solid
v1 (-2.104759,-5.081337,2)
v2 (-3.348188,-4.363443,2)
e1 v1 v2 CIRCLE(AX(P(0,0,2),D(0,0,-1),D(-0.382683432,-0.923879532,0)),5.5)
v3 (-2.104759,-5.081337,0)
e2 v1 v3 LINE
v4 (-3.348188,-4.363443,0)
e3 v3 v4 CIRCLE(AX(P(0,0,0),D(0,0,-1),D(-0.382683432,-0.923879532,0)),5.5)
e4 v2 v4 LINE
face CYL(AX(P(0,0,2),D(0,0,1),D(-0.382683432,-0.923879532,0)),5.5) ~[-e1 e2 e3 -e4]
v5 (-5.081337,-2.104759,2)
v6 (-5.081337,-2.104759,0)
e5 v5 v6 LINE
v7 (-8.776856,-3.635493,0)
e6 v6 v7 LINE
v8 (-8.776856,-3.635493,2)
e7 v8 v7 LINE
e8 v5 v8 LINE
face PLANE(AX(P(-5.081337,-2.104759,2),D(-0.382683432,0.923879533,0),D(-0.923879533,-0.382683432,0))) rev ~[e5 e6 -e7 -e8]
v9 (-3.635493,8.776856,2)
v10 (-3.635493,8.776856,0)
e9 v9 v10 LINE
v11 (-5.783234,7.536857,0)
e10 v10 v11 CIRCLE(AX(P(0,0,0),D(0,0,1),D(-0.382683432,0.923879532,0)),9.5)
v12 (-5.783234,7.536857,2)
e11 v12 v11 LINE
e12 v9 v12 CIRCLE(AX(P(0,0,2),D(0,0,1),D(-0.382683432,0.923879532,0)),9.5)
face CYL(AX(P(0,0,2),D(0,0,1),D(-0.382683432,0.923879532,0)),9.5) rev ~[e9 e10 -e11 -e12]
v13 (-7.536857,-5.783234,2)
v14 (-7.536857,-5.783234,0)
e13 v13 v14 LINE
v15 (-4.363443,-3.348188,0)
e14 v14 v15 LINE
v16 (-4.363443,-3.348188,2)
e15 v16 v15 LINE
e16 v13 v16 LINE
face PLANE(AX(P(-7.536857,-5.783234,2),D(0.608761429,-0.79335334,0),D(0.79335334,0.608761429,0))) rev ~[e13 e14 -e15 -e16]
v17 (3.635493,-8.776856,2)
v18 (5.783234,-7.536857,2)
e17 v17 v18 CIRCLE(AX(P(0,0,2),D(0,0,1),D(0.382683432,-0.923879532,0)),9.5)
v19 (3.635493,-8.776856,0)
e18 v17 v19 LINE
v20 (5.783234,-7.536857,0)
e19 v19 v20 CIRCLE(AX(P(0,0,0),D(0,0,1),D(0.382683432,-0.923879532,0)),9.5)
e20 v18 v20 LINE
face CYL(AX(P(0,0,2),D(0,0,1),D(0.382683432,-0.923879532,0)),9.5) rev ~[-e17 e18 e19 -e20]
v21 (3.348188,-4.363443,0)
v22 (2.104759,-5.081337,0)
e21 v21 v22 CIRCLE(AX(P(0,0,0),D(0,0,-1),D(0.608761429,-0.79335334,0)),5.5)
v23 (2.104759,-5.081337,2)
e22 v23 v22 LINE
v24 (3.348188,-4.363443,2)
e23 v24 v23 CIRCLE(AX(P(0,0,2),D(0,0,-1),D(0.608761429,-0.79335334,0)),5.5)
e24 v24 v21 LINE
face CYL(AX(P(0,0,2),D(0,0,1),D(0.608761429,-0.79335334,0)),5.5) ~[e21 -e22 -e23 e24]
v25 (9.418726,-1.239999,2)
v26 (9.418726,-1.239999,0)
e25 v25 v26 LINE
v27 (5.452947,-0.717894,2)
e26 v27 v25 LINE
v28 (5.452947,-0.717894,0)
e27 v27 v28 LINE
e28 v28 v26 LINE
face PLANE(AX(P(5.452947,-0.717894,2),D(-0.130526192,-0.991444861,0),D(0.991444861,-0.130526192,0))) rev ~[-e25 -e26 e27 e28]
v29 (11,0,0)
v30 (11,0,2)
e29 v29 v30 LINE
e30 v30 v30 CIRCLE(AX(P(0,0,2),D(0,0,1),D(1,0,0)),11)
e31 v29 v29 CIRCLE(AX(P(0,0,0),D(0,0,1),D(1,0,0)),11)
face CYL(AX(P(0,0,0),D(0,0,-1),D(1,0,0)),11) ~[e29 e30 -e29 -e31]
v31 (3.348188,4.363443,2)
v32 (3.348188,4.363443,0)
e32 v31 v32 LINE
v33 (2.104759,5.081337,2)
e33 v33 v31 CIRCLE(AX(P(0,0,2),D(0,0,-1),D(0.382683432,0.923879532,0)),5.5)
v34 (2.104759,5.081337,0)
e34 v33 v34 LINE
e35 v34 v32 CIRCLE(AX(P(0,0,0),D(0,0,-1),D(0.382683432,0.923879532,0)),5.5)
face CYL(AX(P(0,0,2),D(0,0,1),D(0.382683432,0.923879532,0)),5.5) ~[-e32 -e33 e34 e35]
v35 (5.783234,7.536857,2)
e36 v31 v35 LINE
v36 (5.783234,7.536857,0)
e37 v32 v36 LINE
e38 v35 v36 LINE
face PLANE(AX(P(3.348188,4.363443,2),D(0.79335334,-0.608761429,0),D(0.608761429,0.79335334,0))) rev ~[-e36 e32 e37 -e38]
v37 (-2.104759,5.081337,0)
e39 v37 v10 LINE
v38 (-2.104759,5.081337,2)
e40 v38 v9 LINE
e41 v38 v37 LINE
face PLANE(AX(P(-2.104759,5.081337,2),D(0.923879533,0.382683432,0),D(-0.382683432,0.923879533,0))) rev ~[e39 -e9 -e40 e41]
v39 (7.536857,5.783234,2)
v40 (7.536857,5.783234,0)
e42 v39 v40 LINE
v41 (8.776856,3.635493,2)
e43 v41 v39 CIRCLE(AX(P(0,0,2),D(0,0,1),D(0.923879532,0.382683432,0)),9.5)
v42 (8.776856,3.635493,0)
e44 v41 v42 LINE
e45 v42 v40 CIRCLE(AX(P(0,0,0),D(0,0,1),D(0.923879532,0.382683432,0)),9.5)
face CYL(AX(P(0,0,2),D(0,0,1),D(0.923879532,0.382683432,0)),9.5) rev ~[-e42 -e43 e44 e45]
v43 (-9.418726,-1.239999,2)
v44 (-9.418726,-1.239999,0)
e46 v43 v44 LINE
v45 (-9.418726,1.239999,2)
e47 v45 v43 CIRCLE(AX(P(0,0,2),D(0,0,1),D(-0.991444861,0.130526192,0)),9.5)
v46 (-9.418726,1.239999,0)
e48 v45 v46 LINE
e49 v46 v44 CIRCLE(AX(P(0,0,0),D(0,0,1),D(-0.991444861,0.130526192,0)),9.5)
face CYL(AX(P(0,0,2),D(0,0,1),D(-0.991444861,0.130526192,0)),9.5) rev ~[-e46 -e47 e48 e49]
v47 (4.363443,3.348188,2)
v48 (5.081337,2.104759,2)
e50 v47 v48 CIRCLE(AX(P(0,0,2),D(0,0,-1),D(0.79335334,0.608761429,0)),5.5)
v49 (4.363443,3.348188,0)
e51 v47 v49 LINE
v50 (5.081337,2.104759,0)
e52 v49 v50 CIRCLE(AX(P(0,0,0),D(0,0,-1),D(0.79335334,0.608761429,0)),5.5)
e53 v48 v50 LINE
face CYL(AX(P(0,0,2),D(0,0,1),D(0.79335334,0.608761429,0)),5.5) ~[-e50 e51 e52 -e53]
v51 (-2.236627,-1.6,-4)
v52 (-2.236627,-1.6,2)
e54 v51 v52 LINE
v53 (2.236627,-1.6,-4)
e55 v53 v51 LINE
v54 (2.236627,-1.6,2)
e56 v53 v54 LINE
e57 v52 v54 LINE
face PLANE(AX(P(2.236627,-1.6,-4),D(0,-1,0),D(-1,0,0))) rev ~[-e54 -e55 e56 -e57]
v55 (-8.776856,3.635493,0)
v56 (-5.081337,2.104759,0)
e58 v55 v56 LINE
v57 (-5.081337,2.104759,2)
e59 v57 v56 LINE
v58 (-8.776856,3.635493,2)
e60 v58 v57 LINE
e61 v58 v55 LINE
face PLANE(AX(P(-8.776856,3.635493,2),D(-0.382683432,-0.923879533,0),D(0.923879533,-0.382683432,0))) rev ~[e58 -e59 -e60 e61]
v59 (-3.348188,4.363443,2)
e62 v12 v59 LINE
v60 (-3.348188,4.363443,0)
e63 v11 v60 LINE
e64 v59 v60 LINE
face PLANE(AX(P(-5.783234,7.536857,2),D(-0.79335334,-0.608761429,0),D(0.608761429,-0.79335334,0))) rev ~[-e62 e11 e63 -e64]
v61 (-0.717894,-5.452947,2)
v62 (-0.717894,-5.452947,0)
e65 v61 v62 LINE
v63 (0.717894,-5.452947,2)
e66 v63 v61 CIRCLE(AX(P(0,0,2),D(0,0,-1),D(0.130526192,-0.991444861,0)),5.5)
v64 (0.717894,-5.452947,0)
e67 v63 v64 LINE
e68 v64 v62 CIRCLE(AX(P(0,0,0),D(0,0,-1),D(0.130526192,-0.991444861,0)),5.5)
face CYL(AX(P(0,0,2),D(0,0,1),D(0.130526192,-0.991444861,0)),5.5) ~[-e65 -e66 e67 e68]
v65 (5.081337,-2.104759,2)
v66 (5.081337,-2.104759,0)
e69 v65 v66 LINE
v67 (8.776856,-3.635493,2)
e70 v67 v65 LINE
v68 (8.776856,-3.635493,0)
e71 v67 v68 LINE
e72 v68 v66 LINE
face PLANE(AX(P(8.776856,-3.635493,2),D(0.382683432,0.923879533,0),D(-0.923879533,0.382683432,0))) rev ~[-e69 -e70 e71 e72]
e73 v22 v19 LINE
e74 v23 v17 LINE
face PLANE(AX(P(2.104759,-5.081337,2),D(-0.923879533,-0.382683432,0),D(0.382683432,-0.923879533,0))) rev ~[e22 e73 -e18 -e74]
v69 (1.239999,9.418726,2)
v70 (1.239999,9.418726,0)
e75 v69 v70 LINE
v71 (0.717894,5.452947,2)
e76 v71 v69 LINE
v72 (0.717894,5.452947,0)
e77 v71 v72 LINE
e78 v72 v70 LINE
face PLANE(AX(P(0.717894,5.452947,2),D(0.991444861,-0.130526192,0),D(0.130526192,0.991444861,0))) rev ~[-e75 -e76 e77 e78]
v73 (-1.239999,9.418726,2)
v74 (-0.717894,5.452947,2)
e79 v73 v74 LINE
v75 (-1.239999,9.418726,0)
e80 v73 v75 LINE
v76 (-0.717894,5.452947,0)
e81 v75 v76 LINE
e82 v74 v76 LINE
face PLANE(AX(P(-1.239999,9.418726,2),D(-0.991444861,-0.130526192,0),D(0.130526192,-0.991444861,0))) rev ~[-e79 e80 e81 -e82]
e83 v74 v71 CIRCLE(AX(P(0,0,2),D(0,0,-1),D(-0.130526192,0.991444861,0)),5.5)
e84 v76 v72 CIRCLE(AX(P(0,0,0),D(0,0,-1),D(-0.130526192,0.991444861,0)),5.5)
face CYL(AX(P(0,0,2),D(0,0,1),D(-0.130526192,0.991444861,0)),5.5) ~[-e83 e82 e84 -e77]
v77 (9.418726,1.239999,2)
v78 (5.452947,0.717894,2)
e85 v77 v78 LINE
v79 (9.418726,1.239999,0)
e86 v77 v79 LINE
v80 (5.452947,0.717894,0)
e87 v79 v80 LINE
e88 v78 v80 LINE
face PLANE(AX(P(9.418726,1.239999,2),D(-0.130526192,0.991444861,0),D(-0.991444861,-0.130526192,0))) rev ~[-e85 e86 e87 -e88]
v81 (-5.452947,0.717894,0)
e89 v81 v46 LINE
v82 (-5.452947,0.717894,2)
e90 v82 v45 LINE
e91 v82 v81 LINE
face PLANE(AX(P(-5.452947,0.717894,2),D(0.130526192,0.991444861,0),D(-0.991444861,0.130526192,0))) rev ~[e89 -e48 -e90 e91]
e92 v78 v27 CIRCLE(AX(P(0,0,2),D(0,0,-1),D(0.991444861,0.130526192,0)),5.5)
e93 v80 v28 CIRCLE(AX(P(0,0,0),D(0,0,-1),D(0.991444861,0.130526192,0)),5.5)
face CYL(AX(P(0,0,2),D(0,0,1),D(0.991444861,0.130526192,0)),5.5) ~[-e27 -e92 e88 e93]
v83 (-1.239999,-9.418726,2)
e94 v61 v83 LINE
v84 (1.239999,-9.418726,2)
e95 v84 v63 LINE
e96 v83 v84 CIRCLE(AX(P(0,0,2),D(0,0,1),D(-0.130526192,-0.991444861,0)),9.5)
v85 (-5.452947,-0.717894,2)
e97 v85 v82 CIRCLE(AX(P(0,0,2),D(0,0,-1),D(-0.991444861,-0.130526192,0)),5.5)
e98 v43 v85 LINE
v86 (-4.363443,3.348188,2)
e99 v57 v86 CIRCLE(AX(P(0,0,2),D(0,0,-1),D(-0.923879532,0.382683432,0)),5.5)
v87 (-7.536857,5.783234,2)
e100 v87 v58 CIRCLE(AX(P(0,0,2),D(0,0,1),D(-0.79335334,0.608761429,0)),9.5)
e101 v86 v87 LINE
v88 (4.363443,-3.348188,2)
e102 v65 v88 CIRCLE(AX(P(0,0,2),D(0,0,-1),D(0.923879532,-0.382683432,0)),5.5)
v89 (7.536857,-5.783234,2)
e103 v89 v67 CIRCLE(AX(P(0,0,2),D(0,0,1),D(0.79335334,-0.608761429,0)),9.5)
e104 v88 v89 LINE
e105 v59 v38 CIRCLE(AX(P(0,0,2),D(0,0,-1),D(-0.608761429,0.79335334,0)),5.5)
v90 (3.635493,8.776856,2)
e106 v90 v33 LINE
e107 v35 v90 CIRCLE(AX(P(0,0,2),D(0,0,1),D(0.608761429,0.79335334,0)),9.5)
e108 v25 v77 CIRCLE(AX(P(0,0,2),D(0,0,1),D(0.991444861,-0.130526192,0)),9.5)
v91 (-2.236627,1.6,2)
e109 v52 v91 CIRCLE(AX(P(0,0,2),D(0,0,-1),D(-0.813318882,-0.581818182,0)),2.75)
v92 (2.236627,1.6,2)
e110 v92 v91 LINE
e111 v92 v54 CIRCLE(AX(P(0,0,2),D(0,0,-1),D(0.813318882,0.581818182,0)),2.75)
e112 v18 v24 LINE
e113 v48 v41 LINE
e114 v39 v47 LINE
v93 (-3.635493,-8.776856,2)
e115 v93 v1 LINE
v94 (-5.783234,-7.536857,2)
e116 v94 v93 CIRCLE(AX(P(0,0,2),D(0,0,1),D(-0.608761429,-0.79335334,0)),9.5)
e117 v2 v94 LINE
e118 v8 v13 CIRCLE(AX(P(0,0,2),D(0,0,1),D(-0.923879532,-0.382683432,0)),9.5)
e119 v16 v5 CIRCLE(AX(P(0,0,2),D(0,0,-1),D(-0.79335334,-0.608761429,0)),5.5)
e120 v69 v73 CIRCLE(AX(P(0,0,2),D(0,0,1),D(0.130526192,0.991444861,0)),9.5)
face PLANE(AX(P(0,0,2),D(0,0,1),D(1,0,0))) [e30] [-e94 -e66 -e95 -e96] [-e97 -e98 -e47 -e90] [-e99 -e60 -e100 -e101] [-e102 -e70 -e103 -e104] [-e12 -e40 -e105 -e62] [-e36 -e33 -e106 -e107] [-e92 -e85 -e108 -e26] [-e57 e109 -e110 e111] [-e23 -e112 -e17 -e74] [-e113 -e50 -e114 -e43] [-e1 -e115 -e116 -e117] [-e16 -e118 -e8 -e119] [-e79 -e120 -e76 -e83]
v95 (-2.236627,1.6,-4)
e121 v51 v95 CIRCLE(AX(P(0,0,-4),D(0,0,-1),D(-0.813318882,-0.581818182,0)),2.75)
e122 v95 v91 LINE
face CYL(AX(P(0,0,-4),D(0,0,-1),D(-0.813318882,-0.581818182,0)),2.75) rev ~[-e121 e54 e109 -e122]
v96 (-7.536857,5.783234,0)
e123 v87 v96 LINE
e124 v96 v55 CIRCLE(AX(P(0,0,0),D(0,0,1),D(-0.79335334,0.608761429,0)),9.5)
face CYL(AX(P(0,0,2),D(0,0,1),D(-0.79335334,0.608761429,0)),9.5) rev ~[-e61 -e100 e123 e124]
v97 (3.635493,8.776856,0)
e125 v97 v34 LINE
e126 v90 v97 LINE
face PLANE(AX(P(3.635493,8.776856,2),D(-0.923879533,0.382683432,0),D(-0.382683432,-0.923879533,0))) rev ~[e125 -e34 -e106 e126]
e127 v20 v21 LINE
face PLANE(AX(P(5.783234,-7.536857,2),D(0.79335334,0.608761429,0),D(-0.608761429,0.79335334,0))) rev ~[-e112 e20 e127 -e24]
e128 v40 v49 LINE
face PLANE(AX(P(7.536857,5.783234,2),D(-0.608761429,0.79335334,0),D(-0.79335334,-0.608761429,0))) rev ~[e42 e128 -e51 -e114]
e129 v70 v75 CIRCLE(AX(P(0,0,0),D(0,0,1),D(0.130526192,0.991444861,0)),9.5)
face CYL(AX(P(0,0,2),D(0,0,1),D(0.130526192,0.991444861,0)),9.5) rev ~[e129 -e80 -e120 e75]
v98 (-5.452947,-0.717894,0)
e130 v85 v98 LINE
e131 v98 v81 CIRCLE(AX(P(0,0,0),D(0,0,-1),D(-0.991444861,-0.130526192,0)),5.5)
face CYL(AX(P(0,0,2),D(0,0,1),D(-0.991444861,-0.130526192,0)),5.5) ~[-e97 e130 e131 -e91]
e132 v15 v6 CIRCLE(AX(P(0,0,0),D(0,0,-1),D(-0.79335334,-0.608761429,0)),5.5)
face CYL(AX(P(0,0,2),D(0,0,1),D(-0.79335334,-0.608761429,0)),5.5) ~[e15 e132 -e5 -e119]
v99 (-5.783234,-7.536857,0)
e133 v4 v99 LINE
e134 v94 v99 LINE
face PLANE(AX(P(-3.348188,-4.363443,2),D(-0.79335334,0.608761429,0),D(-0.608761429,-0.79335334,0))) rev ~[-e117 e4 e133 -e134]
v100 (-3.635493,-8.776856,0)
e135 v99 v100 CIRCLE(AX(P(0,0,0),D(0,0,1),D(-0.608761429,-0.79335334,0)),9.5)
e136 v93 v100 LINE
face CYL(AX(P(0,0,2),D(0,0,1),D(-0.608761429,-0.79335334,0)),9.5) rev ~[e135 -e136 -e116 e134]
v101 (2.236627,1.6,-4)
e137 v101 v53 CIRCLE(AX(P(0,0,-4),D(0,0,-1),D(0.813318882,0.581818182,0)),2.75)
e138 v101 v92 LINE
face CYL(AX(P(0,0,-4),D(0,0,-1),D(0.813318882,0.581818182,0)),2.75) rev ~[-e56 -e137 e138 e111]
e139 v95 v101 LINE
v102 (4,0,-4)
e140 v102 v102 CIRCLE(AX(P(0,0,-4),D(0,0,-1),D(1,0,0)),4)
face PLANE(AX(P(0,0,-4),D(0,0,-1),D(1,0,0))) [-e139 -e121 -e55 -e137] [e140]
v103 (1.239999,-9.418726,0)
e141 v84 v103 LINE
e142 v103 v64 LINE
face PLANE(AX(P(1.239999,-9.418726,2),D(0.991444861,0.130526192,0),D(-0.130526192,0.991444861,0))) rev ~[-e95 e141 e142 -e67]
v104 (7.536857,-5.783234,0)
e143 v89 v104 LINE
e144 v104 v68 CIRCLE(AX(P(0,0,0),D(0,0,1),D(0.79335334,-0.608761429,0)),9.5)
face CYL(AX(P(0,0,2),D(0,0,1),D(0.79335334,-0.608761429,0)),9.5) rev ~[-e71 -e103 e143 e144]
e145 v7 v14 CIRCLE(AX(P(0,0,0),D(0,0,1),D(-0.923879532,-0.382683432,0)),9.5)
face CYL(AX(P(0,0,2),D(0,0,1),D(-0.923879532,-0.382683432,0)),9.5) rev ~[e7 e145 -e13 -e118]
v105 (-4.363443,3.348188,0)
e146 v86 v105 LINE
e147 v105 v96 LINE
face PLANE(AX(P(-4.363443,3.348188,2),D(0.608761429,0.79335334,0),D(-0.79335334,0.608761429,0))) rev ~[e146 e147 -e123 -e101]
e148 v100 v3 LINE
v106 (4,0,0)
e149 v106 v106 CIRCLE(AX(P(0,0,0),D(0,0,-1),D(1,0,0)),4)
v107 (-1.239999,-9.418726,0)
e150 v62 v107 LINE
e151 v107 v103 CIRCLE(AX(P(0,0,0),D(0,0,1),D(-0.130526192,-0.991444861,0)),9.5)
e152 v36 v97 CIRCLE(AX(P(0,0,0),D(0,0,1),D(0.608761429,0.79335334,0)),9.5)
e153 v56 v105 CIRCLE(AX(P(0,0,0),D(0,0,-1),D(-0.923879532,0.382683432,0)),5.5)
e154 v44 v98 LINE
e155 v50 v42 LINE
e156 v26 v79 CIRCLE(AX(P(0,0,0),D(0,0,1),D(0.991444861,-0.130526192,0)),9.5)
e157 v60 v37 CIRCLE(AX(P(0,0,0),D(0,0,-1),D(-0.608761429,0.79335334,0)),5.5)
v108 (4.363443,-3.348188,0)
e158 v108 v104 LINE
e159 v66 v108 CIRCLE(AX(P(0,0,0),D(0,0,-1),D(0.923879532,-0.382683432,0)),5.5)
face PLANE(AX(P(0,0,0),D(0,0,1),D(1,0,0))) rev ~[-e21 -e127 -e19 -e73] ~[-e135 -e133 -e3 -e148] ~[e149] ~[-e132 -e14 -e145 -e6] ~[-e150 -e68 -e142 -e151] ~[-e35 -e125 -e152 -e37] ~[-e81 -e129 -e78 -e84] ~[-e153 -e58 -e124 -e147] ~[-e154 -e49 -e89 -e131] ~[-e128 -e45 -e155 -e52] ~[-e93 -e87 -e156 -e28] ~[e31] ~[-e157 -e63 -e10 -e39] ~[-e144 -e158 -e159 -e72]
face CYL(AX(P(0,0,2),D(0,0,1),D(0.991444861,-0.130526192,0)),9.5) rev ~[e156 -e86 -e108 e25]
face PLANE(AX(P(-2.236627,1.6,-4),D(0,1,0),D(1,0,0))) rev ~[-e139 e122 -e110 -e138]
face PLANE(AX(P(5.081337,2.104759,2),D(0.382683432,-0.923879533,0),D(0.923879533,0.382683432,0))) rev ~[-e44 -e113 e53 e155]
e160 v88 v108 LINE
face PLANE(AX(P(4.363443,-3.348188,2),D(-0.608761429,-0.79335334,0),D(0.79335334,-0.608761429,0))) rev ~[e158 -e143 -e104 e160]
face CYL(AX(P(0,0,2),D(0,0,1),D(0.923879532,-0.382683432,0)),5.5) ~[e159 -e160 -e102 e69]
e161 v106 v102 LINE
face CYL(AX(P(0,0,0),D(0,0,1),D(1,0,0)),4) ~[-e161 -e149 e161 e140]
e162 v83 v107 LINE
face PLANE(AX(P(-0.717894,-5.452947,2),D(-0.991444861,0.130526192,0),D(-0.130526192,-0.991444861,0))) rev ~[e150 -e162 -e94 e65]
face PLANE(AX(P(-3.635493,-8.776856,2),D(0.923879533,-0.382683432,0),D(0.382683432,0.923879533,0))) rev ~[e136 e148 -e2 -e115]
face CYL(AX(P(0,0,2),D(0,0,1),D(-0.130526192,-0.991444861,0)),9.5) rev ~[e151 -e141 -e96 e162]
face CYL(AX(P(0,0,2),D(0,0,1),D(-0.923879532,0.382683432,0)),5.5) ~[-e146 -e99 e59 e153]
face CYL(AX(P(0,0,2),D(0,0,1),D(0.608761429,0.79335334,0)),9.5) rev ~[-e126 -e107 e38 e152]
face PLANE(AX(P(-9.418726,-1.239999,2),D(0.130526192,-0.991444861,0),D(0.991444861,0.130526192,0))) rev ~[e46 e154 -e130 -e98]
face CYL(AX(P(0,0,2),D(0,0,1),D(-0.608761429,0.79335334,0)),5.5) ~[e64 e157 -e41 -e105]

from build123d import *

# Parameters (mm, degrees)
F0_R            = 11
F1_DEPTH        = 2
F3_DEPTH        = 2
F3_COPIES_COUNT = 12
F4_R            = 4
F5_DEPTH        = 4
F7_DEPTH        = 9


# Not quite as in the source:
# - a pattern or mirror of a feature is missing from the dataset's text; its kind, count and spacing are read off the source's solid


with BuildPart() as f1:
    # F0 (on Top) → F1 (new body)
    with BuildSketch(Plane.XY):
        Circle(F0_R)
    extrude(amount=F1_DEPTH)

    # F2 (on face) → F3 (cut)
    with BuildSketch(Plane.XY.offset(2)):
        with BuildLine():
            Line((9.4187261831, 1.2399988261), (5.4529467376, 0.7178940572))
            ThreePointArc((5.4529467376, 0.7178940572), (5.5, 0), (5.4529467376, -0.7178940572))
            Line((5.4529467376, -0.7178940572), (9.4187261831, -1.2399988261))
            ThreePointArc((9.4187261831, -1.2399988261), (9.5, 0), (9.4187261831, 1.2399988261))
        make_face()
    f3 = extrude(amount=-F3_DEPTH, mode=Mode.SUBTRACT)

    # F3_copies: F3 ×12 about axis
    f3_copies_axis = Axis((0, 0, 0), (0, 0, 1))
    for i in range(1, F3_COPIES_COUNT):
        add(f3.rotate(f3_copies_axis, i * 360 / F3_COPIES_COUNT), mode=Mode.SUBTRACT)

    # F4 (on face) → F5 (join)
    with BuildSketch(Plane(origin=(0, 0, 0), x_dir=(1, 0, 0), z_dir=(0, 0, -1))):
        Circle(F4_R)
    extrude(amount=F5_DEPTH)

    # F6 (on face) → F7 (cut)
    with BuildSketch(Plane(origin=(0, 0, -4), x_dir=(1, 0, 0), z_dir=(0, 0, -1))):
        with BuildLine():
            Line((-2.2366269246, -1.6), (2.2366269246, -1.6))
            ThreePointArc((2.2366269246, -1.6), (2.75, 0), (2.2366269246, 1.6))
            Line((2.2366269246, 1.6), (-2.2366269246, 1.6))
            ThreePointArc((-2.2366269246, 1.6), (-2.75, 0), (-2.2366269246, -1.6))
        make_face()
    extrude(amount=-F7_DEPTH, mode=Mode.SUBTRACT)


solid = f1.part
